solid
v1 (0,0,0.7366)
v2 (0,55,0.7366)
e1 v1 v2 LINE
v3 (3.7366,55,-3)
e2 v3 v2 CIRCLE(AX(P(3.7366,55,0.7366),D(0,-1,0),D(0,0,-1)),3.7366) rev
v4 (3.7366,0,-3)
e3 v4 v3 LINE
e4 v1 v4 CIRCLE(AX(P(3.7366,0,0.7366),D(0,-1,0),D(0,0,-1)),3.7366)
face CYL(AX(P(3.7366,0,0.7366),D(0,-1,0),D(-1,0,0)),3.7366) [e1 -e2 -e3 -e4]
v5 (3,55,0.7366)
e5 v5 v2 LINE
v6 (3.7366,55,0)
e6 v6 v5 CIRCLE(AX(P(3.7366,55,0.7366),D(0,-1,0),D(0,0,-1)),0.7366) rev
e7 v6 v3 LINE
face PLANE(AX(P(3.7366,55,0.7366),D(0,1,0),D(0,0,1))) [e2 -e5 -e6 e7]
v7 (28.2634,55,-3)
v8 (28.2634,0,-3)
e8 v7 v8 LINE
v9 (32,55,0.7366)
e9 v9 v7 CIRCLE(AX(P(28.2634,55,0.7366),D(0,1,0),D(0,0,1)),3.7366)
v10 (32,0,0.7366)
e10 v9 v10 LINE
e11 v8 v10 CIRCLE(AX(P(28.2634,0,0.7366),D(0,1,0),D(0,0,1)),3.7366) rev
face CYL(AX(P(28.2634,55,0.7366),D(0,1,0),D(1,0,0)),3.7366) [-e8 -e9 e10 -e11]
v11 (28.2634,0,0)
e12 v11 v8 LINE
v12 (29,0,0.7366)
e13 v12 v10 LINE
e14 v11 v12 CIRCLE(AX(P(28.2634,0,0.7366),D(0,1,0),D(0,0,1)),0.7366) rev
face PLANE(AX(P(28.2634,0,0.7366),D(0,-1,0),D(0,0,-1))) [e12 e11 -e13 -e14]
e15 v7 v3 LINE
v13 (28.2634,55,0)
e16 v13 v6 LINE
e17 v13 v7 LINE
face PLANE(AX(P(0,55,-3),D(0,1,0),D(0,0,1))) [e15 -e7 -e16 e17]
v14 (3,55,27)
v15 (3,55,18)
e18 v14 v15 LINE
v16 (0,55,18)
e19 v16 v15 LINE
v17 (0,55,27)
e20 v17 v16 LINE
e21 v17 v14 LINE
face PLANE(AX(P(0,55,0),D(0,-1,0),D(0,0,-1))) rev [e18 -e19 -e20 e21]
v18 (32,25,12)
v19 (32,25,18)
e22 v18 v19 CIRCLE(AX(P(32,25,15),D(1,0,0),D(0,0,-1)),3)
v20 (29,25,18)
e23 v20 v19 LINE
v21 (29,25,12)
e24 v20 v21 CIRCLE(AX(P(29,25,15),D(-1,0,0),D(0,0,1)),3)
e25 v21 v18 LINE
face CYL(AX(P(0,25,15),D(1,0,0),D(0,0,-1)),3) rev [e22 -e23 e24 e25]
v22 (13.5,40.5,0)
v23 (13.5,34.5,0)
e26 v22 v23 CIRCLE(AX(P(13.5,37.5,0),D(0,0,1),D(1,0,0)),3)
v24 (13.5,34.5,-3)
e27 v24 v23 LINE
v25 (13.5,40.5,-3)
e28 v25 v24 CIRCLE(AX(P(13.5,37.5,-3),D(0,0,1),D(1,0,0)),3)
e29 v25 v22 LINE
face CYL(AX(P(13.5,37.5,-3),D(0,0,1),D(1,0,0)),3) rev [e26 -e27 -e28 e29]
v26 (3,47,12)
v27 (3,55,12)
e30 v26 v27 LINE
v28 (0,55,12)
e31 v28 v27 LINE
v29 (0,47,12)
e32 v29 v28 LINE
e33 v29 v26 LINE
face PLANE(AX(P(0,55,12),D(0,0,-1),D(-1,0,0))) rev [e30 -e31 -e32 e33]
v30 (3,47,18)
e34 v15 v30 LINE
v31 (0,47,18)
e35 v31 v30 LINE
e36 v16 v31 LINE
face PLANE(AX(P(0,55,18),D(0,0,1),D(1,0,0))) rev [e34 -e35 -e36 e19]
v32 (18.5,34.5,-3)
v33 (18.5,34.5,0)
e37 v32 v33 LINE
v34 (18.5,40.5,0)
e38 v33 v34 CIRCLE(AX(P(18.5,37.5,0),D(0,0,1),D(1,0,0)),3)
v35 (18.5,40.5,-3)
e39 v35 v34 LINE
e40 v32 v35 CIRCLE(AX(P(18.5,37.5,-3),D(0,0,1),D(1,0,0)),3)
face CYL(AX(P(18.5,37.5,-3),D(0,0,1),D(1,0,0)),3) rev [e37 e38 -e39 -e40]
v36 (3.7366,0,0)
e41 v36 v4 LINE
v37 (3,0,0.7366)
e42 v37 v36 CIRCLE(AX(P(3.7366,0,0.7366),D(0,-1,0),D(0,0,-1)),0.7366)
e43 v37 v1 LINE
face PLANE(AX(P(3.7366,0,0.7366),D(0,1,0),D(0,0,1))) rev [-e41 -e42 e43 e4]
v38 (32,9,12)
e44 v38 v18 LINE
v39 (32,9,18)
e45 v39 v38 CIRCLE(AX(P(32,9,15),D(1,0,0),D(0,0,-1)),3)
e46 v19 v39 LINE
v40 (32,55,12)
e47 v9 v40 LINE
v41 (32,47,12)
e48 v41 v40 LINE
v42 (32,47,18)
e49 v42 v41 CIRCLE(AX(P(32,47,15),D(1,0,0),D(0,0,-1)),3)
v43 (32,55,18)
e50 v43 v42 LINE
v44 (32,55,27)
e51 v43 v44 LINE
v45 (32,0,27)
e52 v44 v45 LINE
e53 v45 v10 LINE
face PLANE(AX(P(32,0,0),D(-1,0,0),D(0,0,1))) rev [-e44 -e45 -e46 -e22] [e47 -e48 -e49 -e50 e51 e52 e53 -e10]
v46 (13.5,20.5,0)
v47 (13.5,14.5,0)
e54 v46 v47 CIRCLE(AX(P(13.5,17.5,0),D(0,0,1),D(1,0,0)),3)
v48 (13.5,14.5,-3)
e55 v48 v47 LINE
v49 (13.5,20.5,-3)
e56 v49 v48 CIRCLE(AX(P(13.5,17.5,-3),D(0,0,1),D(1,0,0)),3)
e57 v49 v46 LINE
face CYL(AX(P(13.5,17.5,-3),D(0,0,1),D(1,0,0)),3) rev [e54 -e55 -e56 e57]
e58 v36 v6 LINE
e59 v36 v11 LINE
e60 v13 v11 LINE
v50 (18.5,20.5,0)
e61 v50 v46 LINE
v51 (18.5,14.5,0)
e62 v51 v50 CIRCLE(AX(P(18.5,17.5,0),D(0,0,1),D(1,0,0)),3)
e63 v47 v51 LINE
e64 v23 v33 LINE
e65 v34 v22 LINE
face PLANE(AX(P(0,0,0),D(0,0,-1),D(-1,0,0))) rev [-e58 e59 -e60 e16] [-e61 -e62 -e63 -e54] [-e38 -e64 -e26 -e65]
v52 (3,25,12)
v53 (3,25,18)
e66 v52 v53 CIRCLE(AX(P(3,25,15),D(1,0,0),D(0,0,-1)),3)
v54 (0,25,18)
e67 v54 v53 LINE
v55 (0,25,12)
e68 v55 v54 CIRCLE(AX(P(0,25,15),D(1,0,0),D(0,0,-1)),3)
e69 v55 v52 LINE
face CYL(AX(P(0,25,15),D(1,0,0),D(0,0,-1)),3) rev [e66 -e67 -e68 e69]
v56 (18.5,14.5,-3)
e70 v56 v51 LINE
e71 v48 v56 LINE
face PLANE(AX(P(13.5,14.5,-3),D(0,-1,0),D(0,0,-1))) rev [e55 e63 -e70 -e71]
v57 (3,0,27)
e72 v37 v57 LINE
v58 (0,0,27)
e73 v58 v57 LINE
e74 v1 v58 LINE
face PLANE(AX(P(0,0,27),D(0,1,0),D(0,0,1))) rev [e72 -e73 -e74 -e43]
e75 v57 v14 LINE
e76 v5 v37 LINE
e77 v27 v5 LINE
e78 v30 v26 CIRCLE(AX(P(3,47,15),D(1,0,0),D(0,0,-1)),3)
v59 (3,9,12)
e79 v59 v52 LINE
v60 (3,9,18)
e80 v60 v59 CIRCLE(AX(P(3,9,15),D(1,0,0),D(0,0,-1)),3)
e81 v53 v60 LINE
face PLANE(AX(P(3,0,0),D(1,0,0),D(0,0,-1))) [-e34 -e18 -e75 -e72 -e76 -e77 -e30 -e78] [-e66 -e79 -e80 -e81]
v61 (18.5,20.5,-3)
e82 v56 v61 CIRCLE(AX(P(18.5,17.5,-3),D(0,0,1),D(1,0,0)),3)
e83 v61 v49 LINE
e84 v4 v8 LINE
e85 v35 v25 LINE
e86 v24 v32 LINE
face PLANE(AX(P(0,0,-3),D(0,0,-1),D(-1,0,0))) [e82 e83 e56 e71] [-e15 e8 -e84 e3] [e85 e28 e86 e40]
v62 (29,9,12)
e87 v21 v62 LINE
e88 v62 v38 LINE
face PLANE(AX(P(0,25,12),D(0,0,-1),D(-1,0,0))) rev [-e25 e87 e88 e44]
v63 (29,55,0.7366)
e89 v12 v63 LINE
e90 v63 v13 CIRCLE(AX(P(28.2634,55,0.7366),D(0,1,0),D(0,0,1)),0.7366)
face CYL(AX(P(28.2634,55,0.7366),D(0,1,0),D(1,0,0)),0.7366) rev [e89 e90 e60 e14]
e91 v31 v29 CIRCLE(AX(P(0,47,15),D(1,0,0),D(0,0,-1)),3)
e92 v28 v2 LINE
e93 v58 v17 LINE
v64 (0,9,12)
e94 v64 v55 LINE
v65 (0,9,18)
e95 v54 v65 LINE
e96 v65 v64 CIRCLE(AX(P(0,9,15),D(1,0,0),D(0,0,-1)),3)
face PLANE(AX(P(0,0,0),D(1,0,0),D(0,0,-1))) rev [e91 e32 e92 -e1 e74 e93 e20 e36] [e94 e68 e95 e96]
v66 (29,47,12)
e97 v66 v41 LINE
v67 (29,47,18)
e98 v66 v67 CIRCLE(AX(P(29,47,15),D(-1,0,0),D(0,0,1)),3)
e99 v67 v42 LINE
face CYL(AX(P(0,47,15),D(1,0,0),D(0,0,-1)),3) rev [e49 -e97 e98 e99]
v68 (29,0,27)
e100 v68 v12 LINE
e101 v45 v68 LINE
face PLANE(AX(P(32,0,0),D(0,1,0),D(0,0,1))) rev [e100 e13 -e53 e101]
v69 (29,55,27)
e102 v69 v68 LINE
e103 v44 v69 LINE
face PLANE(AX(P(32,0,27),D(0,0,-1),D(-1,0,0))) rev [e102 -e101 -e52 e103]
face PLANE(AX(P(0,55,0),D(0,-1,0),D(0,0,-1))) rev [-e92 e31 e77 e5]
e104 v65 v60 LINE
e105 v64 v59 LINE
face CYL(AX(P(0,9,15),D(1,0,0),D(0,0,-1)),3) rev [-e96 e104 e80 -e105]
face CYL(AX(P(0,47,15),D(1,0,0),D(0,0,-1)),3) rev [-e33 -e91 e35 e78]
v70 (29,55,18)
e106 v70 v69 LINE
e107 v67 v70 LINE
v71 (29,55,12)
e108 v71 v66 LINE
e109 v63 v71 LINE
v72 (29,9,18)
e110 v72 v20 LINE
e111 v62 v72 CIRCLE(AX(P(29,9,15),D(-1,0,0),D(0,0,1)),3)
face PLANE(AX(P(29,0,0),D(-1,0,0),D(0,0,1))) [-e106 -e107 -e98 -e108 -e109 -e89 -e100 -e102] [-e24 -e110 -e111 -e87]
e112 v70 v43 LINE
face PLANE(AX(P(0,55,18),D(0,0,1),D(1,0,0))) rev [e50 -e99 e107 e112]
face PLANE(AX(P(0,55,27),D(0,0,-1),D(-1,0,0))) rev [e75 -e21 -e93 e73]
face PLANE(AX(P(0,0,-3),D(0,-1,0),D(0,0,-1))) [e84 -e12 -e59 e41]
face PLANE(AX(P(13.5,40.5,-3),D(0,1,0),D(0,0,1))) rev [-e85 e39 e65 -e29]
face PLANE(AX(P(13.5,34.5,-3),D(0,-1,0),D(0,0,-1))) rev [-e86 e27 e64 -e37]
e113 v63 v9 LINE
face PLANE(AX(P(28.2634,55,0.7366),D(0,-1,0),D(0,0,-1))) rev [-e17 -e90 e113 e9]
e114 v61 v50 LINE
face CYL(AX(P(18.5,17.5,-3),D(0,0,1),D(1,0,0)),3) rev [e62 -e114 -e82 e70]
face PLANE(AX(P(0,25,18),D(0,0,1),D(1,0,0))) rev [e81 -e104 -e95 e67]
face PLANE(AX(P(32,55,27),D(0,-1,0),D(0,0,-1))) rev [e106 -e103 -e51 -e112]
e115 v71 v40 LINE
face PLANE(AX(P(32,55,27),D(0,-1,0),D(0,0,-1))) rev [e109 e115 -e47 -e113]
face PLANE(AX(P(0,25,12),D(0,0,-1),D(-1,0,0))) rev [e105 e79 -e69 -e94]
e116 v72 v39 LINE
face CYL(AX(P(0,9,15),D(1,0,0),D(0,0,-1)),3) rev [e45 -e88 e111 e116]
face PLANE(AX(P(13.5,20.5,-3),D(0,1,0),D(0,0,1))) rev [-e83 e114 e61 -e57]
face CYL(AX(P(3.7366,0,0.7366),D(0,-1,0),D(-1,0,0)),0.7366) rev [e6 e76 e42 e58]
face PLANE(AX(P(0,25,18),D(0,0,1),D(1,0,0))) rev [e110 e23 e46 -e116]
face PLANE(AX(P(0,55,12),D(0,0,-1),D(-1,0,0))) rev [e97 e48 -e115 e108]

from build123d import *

# Parameters (mm, degrees)
SKETCH1_W                      = 32
SKETCH1_H                      = 55
BASE_FLANGE1_DEPTH             = 3
EDGE_FLANGE1_STRIP_W           = 13.4732
EDGE_FLANGE1_STRIP_H           = 3
EDGE_FLANGE1_STRIP_CUT_DEPTH   = 55
EDGE_FLANGE1_STRIP_2_W         = 13.4732
EDGE_FLANGE1_STRIP_2_H         = 3
EDGE_FLANGE1_STRIP_CUT_2_DEPTH = 55
EDGE_FLANGE1_DEPTH             = 55
EDGE_FLANGE1_BEND_DEPTH        = 55
CUT_EXTRUDE1_DEPTH             = 70.123078635
CUT_EXTRUDE2_DEPTH             = 70.123078635


# Sheet-metal steps are written as plain solids
with BuildPart() as part:
    # Sketch1 → Base-Flange1 (new body)
    with BuildSketch(Plane.XY):
        with Locations((16, 27.5)):
            Rectangle(SKETCH1_W, SKETCH1_H)
    extrude(amount=-BASE_FLANGE1_DEPTH)

    # Edge-Flange1 strip (across the edge) → Edge-Flange1 strip cut (cut)
    with BuildSketch(Plane(origin=(32, 0, 0), x_dir=(-1, 0, 0), z_dir=(0, 1, 0))):
        with Locations((-3, -1.5)):
            Rectangle(EDGE_FLANGE1_STRIP_W, EDGE_FLANGE1_STRIP_H)
    extrude(amount=EDGE_FLANGE1_STRIP_CUT_DEPTH, mode=Mode.SUBTRACT)

    # Edge-Flange1 strip 2 (across the edge) → Edge-Flange1 strip cut 2 (cut)
    with BuildSketch(Plane.XZ.offset(-55)):
        with Locations((-3, -1.5)):
            Rectangle(EDGE_FLANGE1_STRIP_2_W, EDGE_FLANGE1_STRIP_2_H)
    extrude(amount=EDGE_FLANGE1_STRIP_CUT_2_DEPTH, mode=Mode.SUBTRACT)

    # Edge-Flange1 section (across the edge) → Edge-Flange1 (add)
    with BuildSketch(Plane(origin=(32, 0, 0), x_dir=(-1, 0, 0), z_dir=(0, 1, 0))):
        with BuildLine():
            Line((0, 0.7366), (0, 27))
            Line((0, 27), (3, 27))
            Line((3, 27), (3, 0.7366))
            ThreePointArc((3, 0.7366), (3.215745145, 0.215745145), (3.7366, 0))
            Line((3.7366, 0), (3.7366, -3))
            ThreePointArc((3.7366, -3), (1.094424801, -1.905575199), (0, 0.7366))
        make_face()
    extrude(amount=EDGE_FLANGE1_DEPTH)

    # Edge-Flange1 section 2 (across the edge) → Edge-Flange1 bend (add)
    with BuildSketch(Plane.XZ.offset(-55)):
        with BuildLine():
            Line((0, 0.7366), (0, 27))
            Line((0, 27), (3, 27))
            Line((3, 27), (3, 0.7366))
            ThreePointArc((3, 0.7366), (3.215745145, 0.215745145), (3.7366, 0))
            Line((3.7366, 0), (3.7366, -3))
            ThreePointArc((3.7366, -3), (1.094424801, -1.905575199), (0, 0.7366))
        make_face()
    extrude(amount=EDGE_FLANGE1_BEND_DEPTH)

    # Sketch12 → Cut-Extrude1 (cut, through all)
    with BuildSketch(Plane.XY):
        with BuildLine():
            Line((13.5, 40.5), (18.5, 40.5))
            ThreePointArc((18.5, 40.5), (21.5, 37.5), (18.5, 34.5))
            Line((18.5, 34.5), (13.5, 34.5))
            ThreePointArc((13.5, 34.5), (10.5, 37.5), (13.5, 40.5))
        make_face()
        with BuildLine():
            Line((13.5, 20.5), (18.5, 20.5))
            ThreePointArc((18.5, 20.5), (21.5, 17.5), (18.5, 14.5))
            Line((18.5, 14.5), (13.5, 14.5))
            ThreePointArc((13.5, 14.5), (10.5, 17.5), (13.5, 20.5))
        make_face()
    extrude(amount=-CUT_EXTRUDE1_DEPTH, mode=Mode.SUBTRACT)

    # Sketch13 → Cut-Extrude2 (cut, through all)
    with BuildSketch(Plane(origin=(32, 0, 0), x_dir=(0, 0, -1), z_dir=(1, 0, 0))):
        with BuildLine():
            Line((-12, 55), (-12, 47))
            ThreePointArc((-12, 47), (-15, 44), (-18, 47))
            Line((-18, 47), (-18, 55))
            ThreePointArc((-18, 55), (-15, 58), (-12, 55))
        make_face()
        with BuildLine():
            Line((-12, 25), (-12, 9))
            ThreePointArc((-12, 9), (-15, 6), (-18, 9))
            Line((-18, 9), (-18, 25))
            ThreePointArc((-18, 25), (-15, 28), (-12, 25))
        make_face()
    extrude(amount=-CUT_EXTRUDE2_DEPTH, mode=Mode.SUBTRACT)


solid = part.part
